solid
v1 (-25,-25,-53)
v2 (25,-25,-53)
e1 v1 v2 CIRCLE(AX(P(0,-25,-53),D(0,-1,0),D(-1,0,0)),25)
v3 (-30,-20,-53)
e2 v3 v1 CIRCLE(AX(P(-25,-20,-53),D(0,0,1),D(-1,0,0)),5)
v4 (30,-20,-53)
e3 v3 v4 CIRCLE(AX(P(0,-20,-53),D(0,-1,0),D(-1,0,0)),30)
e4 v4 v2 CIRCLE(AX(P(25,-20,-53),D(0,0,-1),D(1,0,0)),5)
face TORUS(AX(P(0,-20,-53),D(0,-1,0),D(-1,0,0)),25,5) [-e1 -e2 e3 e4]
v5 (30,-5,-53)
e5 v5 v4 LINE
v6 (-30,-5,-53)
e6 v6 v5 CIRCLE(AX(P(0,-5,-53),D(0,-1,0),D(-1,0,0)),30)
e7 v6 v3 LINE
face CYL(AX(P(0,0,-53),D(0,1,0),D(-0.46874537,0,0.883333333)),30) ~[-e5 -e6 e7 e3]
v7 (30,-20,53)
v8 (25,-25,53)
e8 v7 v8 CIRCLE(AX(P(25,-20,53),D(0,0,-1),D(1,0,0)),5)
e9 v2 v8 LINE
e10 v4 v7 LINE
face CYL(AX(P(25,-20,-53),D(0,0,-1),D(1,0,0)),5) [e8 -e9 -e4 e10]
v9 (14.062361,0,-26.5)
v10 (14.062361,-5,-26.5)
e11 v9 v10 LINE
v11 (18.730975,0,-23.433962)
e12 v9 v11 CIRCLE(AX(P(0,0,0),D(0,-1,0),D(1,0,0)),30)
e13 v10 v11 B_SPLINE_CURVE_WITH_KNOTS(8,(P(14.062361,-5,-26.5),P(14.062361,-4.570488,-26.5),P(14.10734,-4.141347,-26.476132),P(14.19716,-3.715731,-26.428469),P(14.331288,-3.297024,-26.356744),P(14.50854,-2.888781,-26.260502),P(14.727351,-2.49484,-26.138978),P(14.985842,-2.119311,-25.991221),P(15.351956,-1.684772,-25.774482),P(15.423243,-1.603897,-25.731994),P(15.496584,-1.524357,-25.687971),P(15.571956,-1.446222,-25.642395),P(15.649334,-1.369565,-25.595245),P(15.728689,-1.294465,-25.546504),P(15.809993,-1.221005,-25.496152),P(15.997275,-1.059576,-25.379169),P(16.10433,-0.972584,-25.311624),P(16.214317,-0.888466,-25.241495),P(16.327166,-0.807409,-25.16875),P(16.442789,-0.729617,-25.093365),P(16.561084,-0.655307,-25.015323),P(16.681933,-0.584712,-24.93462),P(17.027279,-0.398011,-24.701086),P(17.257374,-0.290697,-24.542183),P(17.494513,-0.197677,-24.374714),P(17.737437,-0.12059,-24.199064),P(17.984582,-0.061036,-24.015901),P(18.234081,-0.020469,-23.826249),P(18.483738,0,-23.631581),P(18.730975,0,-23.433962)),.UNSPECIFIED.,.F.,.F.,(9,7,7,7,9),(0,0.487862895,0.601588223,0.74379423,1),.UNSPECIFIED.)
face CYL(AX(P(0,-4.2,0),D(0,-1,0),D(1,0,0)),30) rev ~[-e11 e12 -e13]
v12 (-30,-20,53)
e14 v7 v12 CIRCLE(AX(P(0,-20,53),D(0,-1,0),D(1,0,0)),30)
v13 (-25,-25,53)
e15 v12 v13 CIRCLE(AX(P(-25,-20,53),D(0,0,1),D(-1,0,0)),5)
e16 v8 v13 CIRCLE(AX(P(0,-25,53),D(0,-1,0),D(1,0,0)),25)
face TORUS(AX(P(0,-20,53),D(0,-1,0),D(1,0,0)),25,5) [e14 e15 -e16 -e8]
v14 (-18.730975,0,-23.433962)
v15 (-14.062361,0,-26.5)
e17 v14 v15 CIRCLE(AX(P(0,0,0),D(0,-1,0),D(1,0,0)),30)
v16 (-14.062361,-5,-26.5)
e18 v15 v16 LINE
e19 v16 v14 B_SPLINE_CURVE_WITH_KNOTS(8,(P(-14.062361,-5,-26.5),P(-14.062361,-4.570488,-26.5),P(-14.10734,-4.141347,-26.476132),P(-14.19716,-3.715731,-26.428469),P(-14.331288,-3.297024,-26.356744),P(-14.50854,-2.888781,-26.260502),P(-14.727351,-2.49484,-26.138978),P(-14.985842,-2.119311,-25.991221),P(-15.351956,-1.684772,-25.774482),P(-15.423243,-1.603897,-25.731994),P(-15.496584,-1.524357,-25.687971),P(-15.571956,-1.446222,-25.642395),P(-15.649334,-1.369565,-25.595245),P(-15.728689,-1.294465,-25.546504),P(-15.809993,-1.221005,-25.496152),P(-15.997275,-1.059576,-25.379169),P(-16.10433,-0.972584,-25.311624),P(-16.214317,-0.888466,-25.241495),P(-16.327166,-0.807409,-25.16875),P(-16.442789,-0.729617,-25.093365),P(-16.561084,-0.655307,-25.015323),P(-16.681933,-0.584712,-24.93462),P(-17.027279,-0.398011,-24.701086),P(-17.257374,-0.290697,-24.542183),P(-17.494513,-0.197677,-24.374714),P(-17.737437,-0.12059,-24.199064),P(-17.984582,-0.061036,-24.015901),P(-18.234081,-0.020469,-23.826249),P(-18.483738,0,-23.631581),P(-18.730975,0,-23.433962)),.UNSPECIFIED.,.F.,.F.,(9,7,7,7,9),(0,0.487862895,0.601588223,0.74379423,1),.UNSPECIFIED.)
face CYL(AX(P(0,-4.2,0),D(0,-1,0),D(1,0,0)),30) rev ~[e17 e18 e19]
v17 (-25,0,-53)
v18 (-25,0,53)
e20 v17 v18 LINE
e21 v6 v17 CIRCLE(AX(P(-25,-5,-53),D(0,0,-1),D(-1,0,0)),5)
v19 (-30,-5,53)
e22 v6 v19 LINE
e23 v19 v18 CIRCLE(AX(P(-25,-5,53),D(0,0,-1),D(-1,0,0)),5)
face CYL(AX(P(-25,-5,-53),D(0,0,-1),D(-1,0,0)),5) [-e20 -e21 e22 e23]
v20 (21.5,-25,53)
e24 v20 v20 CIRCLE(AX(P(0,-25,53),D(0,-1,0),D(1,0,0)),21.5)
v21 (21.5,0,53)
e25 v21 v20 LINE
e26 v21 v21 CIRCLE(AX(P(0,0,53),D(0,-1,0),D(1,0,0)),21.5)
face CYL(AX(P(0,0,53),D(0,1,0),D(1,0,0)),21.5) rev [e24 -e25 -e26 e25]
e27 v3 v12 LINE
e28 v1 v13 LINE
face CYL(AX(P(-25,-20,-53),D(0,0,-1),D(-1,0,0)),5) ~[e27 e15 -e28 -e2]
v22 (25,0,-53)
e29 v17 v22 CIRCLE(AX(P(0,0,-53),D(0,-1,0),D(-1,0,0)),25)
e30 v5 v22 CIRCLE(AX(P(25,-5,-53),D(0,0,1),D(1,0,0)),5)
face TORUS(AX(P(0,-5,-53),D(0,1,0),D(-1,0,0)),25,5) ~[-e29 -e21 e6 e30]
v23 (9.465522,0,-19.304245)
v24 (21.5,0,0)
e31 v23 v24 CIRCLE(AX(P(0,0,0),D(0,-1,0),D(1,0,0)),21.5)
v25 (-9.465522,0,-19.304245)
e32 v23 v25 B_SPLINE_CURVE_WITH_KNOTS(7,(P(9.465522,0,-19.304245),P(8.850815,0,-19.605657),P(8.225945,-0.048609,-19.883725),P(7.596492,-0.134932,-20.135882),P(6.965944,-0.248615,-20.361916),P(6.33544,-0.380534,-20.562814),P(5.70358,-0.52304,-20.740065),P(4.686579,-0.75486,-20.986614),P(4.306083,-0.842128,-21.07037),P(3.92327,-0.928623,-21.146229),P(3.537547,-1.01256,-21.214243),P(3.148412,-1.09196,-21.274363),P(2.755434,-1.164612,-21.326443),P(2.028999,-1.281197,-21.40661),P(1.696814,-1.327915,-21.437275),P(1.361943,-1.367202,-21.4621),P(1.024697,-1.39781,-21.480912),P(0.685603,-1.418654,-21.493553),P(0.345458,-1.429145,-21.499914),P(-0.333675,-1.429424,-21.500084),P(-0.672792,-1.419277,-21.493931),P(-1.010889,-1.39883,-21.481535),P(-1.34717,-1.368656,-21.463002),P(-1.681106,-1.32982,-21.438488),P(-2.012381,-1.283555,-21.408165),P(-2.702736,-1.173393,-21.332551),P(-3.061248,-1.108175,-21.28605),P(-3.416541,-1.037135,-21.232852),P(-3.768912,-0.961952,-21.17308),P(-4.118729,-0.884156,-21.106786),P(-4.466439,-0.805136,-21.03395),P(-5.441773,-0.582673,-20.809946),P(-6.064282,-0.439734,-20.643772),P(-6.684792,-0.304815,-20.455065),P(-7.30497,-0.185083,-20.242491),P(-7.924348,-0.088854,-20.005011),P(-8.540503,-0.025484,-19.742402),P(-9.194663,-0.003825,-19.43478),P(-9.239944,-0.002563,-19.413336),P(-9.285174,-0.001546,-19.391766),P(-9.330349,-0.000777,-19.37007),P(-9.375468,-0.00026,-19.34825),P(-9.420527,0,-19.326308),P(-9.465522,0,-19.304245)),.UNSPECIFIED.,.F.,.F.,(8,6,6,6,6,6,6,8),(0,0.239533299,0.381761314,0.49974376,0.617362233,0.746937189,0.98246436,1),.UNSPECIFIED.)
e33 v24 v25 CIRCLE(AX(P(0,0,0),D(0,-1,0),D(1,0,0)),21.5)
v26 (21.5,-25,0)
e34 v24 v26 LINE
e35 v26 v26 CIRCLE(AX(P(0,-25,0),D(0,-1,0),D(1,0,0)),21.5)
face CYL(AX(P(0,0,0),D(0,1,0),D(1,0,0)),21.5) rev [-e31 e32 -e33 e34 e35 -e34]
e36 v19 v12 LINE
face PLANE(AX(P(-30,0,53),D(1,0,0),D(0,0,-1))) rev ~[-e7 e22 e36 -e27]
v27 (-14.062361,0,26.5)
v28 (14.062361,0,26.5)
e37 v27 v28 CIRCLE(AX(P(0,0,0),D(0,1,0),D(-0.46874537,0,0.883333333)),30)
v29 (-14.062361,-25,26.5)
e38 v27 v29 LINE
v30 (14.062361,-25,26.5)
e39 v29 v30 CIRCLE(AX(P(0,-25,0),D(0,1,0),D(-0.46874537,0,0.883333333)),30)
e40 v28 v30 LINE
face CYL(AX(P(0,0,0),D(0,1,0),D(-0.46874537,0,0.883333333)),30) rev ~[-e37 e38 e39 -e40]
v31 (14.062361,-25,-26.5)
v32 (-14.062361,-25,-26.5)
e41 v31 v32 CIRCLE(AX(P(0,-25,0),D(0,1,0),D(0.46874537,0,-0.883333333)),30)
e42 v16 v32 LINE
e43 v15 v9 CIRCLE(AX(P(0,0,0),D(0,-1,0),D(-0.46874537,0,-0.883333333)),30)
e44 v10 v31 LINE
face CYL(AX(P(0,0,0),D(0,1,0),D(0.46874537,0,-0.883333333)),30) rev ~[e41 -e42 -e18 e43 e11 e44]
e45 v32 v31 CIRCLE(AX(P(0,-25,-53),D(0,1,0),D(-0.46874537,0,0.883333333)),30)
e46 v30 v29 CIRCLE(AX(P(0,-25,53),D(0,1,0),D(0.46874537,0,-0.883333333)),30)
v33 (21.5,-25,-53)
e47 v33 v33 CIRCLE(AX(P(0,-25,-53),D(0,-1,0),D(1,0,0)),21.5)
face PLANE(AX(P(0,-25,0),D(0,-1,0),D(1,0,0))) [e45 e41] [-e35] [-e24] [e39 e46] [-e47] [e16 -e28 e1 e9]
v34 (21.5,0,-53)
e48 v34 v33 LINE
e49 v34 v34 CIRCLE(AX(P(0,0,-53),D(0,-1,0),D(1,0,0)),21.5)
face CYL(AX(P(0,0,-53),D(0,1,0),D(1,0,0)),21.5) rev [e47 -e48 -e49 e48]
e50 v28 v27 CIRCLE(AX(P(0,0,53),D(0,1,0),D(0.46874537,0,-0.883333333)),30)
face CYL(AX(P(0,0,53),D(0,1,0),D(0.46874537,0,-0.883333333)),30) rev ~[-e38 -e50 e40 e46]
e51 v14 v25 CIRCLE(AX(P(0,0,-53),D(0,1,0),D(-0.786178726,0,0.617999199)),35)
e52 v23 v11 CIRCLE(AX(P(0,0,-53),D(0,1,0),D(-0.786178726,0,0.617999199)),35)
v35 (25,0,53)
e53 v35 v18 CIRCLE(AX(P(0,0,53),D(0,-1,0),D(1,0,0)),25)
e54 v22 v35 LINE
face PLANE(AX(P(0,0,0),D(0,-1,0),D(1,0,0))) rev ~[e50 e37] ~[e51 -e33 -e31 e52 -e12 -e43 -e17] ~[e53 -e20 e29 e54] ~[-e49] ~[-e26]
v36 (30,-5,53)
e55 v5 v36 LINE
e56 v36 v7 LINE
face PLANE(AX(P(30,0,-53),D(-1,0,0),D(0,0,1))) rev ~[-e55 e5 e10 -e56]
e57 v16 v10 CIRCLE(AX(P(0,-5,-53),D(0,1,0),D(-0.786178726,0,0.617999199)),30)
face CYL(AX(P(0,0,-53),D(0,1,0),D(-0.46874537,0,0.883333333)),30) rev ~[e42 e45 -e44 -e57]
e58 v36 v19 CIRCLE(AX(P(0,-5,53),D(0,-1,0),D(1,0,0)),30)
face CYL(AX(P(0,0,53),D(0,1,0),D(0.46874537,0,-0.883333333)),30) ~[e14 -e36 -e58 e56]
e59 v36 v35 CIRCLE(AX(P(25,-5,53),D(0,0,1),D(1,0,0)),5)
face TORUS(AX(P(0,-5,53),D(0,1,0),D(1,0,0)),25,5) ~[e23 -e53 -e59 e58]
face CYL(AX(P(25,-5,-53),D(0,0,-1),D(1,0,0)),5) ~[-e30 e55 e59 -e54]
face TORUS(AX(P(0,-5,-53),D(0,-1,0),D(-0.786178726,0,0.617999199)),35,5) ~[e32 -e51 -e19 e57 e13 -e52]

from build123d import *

# Parameters (mm, degrees)
F0_R         = 21.5
F1_DEPTH     = 25
F2_T1_DEPTH  = 106
F2_T4_ANGLE  = 180
F2_T8_ANGLE  = 103.6596556564
F2_S9_R      = 30
F2_T10_DEPTH = 37
F2_T12_ANGLE = 180
F2_T14_ANGLE = 180
F2_T16_ANGLE = 180


# Not quite as in the source:
# - a fillet or chamfer that OpenCascade refuses, or shapes differently, is made with other operations: its cross-section is extruded or revolved along the edge and cut away or added


with BuildPart() as f1:
    # F0 (on Front) → F1 (new body)
    with BuildSketch(Plane.XZ):
        with BuildLine():
            ThreePointArc((14.0623611104, -26.5), (25.7086642332, -15.4617134673), (30, 0))
            ThreePointArc((30, 0), (25.7086642332, 15.4617134673), (14.0623611104, 26.5))
            ThreePointArc((14.0623611104, 26.5), (0, 23), (-14.0623611104, 26.5))
            ThreePointArc((-14.0623611104, 26.5), (-25.7086642332, 15.4617134673), (-30, 0))
            ThreePointArc((-30, 0), (-25.7086642332, -15.4617134673), (-14.0623611104, -26.5))
            ThreePointArc((-14.0623611104, -26.5), (0, -23), (14.0623611104, -26.5))
        make_face()
        Circle(F0_R, mode=Mode.SUBTRACT)
        with BuildLine():
            Line((30, -53), (30, 0))
            ThreePointArc((30, 0), (25.7086642332, -15.4617134673), (14.0623611104, -26.5))
            ThreePointArc((14.0623611104, -26.5), (25.7086642332, -37.5382865327), (30, -53))
        make_face()
        with BuildLine():
            ThreePointArc((14.0623611104, 26.5), (25.7086642332, 15.4617134673), (30, 0))
            Line((30, 0), (30, 53))
            ThreePointArc((30, 53), (25.7086642332, 37.5382865327), (14.0623611104, 26.5))
        make_face()
        with BuildLine():
            ThreePointArc((-14.0623611104, 26.5), (0, 30), (14.0623611104, 26.5))
            ThreePointArc((14.0623611104, 26.5), (25.7086642332, 37.5382865327), (30, 53))
            ThreePointArc((30, 53), (0, 83), (-30, 53))
            ThreePointArc((-30, 53), (-25.7086642332, 37.5382865327), (-14.0623611104, 26.5))
        make_face()
        with Locations((0, 53)):
            Circle(F0_R, mode=Mode.SUBTRACT)
        with BuildLine():
            ThreePointArc((30, -53), (25.7086642332, -37.5382865327), (14.0623611104, -26.5))
            ThreePointArc((14.0623611104, -26.5), (0, -30), (-14.0623611104, -26.5))
            ThreePointArc((-14.0623611104, -26.5), (-25.7086642332, -37.5382865327), (-30, -53))
            ThreePointArc((-30, -53), (0, -83), (30, -53))
        make_face()
        with Locations((0, -53)):
            Circle(F0_R, mode=Mode.SUBTRACT)
        with BuildLine():
            ThreePointArc((-30, 0), (-25.7086642332, 15.4617134673), (-14.0623611104, 26.5))
            ThreePointArc((-14.0623611104, 26.5), (-25.7086642332, 37.5382865327), (-30, 53))
            Line((-30, 53), (-30, 0))
        make_face()
        with BuildLine():
            ThreePointArc((-30, -53), (-25.7086642332, -37.5382865327), (-14.0623611104, -26.5))
            ThreePointArc((-14.0623611104, -26.5), (-25.7086642332, -15.4617134673), (-30, 0))
            Line((-30, 0), (-30, -53))
        make_face()
    extrude(amount=F1_DEPTH)

    # F2: fillet of radius 5 on 3 edges, made by hand

    # F2_s2 → F2_t1 (cut)
    with BuildSketch(Plane.XY.offset(-53)):
        with BuildLine():
            ThreePointArc((-30, -20), (-28.5355339059, -23.5355339059), (-25, -25))
            Line((-25, -25), (-25, -25.1))
            Line((-25, -25.1), (-30.1, -25.1))
            Line((-30.1, -25.1), (-30.1, -20))
            Line((-30.1, -20), (-30, -20))
        make_face()
        with BuildLine():
            ThreePointArc((-30, -5), (-28.5355339059, -1.4644660941), (-25, 0))
            Line((-25, 0), (-25, 0.1))
            Line((-25, 0.1), (-30.1, 0.1))
            Line((-30.1, 0.1), (-30.1, -5))
            Line((-30.1, -5), (-30, -5))
        make_face()
        with BuildLine():
            ThreePointArc((30, -5), (28.5355339059, -1.4644660941), (25, 0))
            Line((25, 0), (25, 0.1))
            Line((25, 0.1), (30.1, 0.1))
            Line((30.1, 0.1), (30.1, -5))
            Line((30.1, -5), (30, -5))
        make_face()
        with BuildLine():
            ThreePointArc((30, -20), (28.5355339059, -23.5355339059), (25, -25))
            Line((25, -25), (25, -25.1))
            Line((25, -25.1), (30.1, -25.1))
            Line((30.1, -25.1), (30.1, -20))
            Line((30.1, -20), (30, -20))
        make_face()
    extrude(amount=F2_T1_DEPTH, mode=Mode.SUBTRACT)

    # F2_s3 → F2_t4 (revolve, cut)
    with BuildSketch(Plane.XY.offset(-53)):
        with BuildLine():
            ThreePointArc((-30, -5), (-28.5355339059, -1.4644660941), (-25, 0))
            Line((-25, 0), (-25, 0.1))
            Line((-25, 0.1), (-30.1, 0.1))
            Line((-30.1, 0.1), (-30.1, -5))
            Line((-30.1, -5), (-30, -5))
        make_face()
    revolve(axis=Axis((0, 0, -53), (0, -1, 0)), revolution_arc=F2_T4_ANGLE, mode=Mode.SUBTRACT)


with BuildPart() as f2_tool6:
    # F2_s7 → F2_t8 (revolve)
    with BuildSketch(Plane(origin=(-25.7504646383, 0, -32.7580804495), x_dir=(0, 1, 0), z_dir=(-0.6179991993, 0, -0.7861787263))):
        with BuildLine():
            ThreePointArc((-5, 2.7539575651), (-1.4644660941, 1.289491471), (0, -2.2460424349))
            Line((0, -2.2460424349), (0.1, -2.2460424349))
            Line((0.1, -2.2460424349), (0.1, 2.8539575651))
            Line((0.1, 2.8539575651), (-5, 2.8539575651))
            Line((-5, 2.8539575651), (-5, 2.7539575651))
        make_face()
    revolve(axis=Axis((0, 0, -53), (0, 1, 0)), revolution_arc=F2_T8_ANGLE)

    # F2_s9 → F2_t10 (intersect, symmetric)
    with BuildSketch(Plane.XZ.offset(4.2)):
        Circle(F2_S9_R)
    extrude(amount=F2_T10_DEPTH, both=True, mode=Mode.INTERSECT)


with BuildPart() as f1_1:
    add(f1.part)

    # F2_t5: cut F2_tool6
    add(f2_tool6.part, mode=Mode.SUBTRACT)

    # F2_s11 → F2_t12 (revolve, cut)
    with BuildSketch(Plane.XY.offset(53)):
        with BuildLine():
            ThreePointArc((30, -5), (28.5355339059, -1.4644660941), (25, 0))
            Line((25, 0), (25, 0.1))
            Line((25, 0.1), (30.1, 0.1))
            Line((30.1, 0.1), (30.1, -5))
            Line((30.1, -5), (30, -5))
        make_face()
    revolve(axis=Axis((0, 0, 53), (0, -1, 0)), revolution_arc=F2_T12_ANGLE, mode=Mode.SUBTRACT)

    # F2_s13 → F2_t14 (revolve, cut)
    with BuildSketch(Plane.XY.offset(53)):
        with BuildLine():
            ThreePointArc((30, -20), (28.5355339059, -23.5355339059), (25, -25))
            Line((25, -25), (25, -25.1))
            Line((25, -25.1), (30.1, -25.1))
            Line((30.1, -25.1), (30.1, -20))
            Line((30.1, -20), (30, -20))
        make_face()
    revolve(axis=Axis((0, -25, 53), (0, -1, 0)), revolution_arc=F2_T14_ANGLE, mode=Mode.SUBTRACT)

    # F2_s15 → F2_t16 (revolve, cut)
    with BuildSketch(Plane.XY.offset(-53)):
        with BuildLine():
            ThreePointArc((-30, -20), (-28.5355339059, -23.5355339059), (-25, -25))
            Line((-25, -25), (-25, -25.1))
            Line((-25, -25.1), (-30.1, -25.1))
            Line((-30.1, -25.1), (-30.1, -20))
            Line((-30.1, -20), (-30, -20))
        make_face()
    revolve(axis=Axis((0, -25, -53), (0, -1, 0)), revolution_arc=F2_T16_ANGLE, mode=Mode.SUBTRACT)


solid = f1_1.part
